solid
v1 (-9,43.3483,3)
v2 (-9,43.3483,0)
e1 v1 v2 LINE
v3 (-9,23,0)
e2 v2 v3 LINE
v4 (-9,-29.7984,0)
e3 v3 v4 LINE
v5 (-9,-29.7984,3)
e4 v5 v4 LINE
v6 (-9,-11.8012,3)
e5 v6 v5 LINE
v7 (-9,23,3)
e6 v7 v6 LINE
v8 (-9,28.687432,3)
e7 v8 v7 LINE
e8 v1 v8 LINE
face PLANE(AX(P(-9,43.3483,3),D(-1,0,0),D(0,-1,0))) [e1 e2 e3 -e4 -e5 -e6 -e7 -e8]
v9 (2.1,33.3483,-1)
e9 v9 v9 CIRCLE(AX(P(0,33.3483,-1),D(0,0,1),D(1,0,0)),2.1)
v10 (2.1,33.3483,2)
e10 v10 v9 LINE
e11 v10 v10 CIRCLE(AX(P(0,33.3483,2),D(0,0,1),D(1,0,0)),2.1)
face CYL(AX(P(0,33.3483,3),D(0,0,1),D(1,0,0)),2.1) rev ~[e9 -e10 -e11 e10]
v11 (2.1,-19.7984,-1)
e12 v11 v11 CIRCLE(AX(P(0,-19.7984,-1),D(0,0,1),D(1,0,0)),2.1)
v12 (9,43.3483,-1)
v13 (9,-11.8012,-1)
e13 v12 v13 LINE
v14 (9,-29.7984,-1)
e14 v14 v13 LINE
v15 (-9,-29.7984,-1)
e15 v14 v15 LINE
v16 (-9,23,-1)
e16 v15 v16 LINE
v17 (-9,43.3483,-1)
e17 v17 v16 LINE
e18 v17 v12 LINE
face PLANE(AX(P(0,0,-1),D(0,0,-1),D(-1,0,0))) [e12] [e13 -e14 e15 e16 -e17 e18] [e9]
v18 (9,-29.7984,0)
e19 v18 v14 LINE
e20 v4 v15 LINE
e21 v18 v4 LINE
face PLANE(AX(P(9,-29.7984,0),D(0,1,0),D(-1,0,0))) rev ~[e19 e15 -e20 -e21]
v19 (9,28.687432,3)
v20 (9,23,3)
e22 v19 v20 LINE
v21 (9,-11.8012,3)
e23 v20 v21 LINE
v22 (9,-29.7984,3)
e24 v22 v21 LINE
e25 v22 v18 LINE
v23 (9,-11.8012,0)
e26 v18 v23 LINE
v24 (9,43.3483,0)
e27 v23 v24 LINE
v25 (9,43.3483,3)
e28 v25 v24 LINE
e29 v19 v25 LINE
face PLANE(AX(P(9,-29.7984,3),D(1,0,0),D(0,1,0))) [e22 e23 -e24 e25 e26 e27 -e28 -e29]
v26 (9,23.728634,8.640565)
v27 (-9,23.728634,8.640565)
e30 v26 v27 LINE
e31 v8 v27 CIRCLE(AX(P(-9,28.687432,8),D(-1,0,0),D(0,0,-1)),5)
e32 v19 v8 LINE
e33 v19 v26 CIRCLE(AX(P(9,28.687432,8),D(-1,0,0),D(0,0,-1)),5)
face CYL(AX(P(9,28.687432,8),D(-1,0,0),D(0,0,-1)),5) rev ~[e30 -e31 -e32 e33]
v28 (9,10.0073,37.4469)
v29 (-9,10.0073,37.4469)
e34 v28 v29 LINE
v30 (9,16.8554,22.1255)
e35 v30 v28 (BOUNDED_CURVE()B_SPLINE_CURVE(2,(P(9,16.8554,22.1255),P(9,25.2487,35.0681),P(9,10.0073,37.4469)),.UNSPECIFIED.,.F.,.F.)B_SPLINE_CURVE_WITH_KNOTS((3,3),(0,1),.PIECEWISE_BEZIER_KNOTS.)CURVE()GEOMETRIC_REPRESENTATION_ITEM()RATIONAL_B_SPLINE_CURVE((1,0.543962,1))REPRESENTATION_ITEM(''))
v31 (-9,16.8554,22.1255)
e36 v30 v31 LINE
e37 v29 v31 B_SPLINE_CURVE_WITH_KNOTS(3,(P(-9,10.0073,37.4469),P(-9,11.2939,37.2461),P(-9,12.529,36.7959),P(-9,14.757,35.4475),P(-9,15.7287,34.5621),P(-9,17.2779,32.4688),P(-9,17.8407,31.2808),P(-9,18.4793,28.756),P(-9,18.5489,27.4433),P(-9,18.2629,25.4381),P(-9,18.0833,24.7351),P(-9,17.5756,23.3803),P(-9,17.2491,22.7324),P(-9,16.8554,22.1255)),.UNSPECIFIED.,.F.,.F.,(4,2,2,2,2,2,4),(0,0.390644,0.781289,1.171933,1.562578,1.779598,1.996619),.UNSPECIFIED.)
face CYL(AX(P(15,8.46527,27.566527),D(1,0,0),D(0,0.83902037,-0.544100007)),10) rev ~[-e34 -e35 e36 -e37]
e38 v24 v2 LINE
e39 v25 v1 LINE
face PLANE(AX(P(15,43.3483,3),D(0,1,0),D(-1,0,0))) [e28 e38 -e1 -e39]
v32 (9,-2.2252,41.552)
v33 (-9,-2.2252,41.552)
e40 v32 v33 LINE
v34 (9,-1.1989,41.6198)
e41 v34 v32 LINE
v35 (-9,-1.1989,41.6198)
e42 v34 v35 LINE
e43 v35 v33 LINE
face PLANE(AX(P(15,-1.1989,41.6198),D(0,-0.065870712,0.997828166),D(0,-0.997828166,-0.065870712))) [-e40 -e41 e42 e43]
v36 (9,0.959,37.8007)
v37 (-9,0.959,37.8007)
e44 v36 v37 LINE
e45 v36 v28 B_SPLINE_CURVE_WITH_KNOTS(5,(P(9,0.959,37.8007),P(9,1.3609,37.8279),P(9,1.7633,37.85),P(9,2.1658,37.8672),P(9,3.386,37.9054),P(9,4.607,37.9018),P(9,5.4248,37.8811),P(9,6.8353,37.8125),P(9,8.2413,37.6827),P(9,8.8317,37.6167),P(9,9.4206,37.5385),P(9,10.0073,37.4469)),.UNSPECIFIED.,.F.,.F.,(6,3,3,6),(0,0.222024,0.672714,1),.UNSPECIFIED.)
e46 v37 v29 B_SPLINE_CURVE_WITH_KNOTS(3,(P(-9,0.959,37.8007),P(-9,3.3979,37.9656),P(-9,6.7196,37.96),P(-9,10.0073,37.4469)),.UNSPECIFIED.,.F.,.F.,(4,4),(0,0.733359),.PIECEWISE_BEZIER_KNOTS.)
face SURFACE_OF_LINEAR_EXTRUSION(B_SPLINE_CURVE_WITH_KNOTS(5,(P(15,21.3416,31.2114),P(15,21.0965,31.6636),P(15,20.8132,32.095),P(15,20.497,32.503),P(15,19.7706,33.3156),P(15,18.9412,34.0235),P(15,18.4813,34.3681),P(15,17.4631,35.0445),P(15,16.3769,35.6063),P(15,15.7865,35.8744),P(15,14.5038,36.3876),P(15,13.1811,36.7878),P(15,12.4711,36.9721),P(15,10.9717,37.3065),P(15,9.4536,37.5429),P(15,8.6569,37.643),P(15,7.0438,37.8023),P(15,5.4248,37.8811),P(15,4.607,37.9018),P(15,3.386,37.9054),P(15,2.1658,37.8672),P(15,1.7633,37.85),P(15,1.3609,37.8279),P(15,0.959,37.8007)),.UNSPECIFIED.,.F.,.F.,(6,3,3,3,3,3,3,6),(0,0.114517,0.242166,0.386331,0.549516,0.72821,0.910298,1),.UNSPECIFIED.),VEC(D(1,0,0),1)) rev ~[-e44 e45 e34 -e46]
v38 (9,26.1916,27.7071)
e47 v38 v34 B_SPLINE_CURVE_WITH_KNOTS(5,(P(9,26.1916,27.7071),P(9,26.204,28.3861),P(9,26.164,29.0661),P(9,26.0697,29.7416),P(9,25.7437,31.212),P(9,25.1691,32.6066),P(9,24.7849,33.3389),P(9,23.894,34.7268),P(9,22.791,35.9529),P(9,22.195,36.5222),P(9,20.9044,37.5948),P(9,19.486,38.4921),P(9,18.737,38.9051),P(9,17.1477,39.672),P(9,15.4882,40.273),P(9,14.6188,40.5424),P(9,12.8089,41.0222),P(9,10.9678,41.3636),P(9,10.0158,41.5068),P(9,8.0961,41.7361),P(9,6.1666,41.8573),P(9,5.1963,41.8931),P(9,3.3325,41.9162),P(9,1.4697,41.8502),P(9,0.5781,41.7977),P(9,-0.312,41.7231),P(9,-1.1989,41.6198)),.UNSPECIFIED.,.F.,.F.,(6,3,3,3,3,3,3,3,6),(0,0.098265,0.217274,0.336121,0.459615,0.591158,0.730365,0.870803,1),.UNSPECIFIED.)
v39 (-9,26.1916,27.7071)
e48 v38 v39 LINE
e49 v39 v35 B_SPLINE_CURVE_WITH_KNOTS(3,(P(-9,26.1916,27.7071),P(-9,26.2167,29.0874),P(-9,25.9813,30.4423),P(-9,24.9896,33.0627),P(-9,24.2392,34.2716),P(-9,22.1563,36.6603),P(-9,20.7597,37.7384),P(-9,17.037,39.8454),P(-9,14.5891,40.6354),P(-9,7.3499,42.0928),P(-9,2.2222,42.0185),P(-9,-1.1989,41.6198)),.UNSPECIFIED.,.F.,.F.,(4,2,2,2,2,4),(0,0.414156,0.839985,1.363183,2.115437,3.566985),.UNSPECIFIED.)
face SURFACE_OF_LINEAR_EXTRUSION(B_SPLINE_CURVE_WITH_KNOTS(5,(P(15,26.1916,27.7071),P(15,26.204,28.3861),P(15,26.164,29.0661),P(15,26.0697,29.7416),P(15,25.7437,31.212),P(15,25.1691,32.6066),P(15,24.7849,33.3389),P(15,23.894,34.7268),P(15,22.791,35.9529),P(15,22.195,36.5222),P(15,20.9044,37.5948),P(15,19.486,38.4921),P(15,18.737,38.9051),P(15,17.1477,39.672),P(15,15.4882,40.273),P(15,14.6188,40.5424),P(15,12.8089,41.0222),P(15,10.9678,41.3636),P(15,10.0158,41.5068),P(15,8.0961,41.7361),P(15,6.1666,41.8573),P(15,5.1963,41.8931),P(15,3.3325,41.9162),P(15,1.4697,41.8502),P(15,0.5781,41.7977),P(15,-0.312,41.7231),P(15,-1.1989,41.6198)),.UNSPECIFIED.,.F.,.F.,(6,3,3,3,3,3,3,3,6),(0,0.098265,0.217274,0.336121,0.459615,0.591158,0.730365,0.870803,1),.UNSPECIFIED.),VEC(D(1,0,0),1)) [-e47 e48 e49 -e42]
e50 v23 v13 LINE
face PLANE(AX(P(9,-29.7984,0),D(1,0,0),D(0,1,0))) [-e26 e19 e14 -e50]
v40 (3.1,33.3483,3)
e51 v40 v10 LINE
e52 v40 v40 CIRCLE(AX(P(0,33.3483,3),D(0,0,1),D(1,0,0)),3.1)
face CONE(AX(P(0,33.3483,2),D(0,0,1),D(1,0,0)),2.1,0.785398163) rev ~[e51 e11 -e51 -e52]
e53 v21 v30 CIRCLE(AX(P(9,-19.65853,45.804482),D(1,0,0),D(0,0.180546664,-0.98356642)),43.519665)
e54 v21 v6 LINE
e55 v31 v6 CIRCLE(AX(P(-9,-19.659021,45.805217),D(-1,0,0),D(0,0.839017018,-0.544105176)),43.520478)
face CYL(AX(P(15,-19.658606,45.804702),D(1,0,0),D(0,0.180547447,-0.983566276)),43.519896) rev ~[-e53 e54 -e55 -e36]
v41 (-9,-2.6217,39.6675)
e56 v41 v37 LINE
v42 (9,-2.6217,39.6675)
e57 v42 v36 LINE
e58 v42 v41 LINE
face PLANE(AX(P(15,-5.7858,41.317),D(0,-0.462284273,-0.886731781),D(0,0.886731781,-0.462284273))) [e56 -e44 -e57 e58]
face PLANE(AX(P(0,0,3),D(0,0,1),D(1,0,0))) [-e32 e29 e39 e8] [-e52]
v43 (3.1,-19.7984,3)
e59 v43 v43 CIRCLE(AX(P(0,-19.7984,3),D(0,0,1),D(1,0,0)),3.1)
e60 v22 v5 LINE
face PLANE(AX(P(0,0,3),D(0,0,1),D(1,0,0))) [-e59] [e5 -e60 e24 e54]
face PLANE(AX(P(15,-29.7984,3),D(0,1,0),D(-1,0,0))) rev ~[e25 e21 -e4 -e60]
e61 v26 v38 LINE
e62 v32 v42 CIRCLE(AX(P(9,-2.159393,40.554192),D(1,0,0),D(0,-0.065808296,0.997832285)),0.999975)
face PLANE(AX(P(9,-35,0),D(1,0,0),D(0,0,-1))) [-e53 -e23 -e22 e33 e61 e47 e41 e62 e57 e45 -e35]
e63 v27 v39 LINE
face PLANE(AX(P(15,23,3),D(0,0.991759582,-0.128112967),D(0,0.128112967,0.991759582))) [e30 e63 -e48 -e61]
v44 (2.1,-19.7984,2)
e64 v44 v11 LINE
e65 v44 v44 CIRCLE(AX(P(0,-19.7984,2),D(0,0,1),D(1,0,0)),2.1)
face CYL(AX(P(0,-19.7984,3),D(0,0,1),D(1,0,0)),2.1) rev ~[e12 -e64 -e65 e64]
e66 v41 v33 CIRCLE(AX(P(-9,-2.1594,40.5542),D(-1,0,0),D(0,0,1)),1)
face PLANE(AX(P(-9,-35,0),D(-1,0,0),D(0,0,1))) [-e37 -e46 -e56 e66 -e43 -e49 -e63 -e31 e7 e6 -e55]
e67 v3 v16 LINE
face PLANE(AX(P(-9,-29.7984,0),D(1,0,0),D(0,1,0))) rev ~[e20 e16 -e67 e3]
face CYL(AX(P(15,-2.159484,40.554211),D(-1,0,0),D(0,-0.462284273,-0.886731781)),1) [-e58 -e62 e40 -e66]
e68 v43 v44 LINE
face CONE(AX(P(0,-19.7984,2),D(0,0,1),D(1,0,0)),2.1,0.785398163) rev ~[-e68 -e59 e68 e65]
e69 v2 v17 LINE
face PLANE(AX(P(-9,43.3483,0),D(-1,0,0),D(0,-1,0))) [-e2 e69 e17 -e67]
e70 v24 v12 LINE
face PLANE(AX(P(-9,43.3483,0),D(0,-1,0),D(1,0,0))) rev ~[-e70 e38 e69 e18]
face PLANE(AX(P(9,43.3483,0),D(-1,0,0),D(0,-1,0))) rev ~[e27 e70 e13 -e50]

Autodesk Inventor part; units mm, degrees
ref_plane "YZ Plane" through (0, 0, 0) normal (1, 0, 0) x (0, 1, 0)
ref_plane "XZ Plane" through (0, 0, 0) normal (0, 1, 0) x (-1, 0, 0)
ref_plane "XY Plane" through (0, 0, 0) normal (0, 0, 1) x (1, 0, 0)
sketch "Boceto1" plane through (0, 0, 0) normal (0, 0, 1) x (1, 0, 0)
  line L0 (15, -35) -> (-15, -35)
  line L1 (-15, -35) -> (-15, 35)
  line L2 (-15, 35) -> (15, 35)
  line L3 (15, 35) -> (15, -35)
  line L4 (15, -35) -> (-15, 35) construction
  line L5 (-15, -35) -> (15, 35) construction
  line L6 (0, 35) -> (0, -35) construction
  circle A0 centre (0, 28.5) radius 2
  line L7 (-19.7941, 0) -> (22.4931, 0) construction
  circle A1 centre (0, -28.5) radius 2
  point P0 (0, 0)
  dimension "d0" = 70
  dimension "d1" = 30
  dimension "d2" = 4
  dimension "d3" = 6.5
  dimension "d4" = 6.5
extrude "Extrusión1" add sketch "Boceto1" along normal blind 3
sketch "Boceto2" plane through (15, -35, 0) normal (1, 0, 0) x (0, 0, -1)
  line L0 (-1.8712, 18.1097) -> (-14.4034, 50.7658) construction
  line L1 (-14.4034, 50.7658) -> (-23.5228, 61.8317) construction
  line L2 (-23.5228, 61.8317) -> (-35.5227, 59.996) construction
  line L3 (-35.5227, 59.996) -> (-40.0788, 48.4605) construction
  line L4 (-40.0788, 48.4605) -> (-40.0788, 37.855) construction
  line L5 (-40.0788, 37.855) -> (-39.6332, 34.0327) construction
  spline S0 degree 4 poles (-1.8712, 18.1097) (-14.4034, 50.7658) (-23.5228, 61.8317) (-35.5227, 59.996) (-40.0788, 48.4605) (-40.0788, 37.855) (-39.6332, 34.0327) knots 1 1 1 1 1 2 3 4 4 4 4 4 construction
  line L6 (-3, 61.5) -> (-3, 65.5) projected
  line L7 (-3, 0) -> (-3, 70) projected
  line L8 (-3, 70) -> (-3, 58)
  line L9 (-3, 58) -> (-27.7071, 61.1916)
  line L10 (-3, 58) -> (-3, 23.1988)
  line L11 (-41.6198, 33.8011) -> (-41.317, 29.2142)
  line L12 (-41.317, 29.2142) -> (-37.8007, 35.959)
  arc A0 (-3, 23.1988) -> (-31.2114, 56.3416) centre (-45.8049, 15.3413) ccw
  spline S1 degree 5 poles (-27.7071, 61.1916) (-28.3861, 61.204) (-29.0661, 61.164) (-29.7416, 61.0697) (-31.212, 60.7437) (-32.6066, 60.1691) (-33.3389, 59.7849) (-34.7268, 58.894) (-35.9529, 57.791) (-36.5222, 57.195) (-37.5948, 55.9044) (-38.4921, 54.486) (-38.9051, 53.737) (-39.672, 52.1477) (-40.273, 50.4882) (-40.5424, 49.6188) (-41.0222, 47.8089) (-41.3636, 45.9678) (-41.5068, 45.0158) (-41.7361, 43.0961) (-41.8573, 41.1666) (-41.8931, 40.1963) (-41.9162, 38.3325) (-41.8502, 36.4697) (-41.7977, 35.5781) (-41.7231, 34.688) (-41.6198, 33.8011) knots 0 0 0 0 0 0 0.098265 0.098265 0.098265 0.217274 0.217274 0.217274 0.336121 0.336121 0.336121 0.459615 0.459615 0.459615 0.591158 0.591158 0.591158 0.730365 0.730365 0.730365 0.870803 0.870803 0.870803 1 1 1 1 1 1
  spline S2 degree 5 poles (-31.2114, 56.3416) (-31.6636, 56.0965) (-32.095, 55.8132) (-32.503, 55.497) (-33.3156, 54.7706) (-34.0235, 53.9412) (-34.3681, 53.4813) (-35.0445, 52.4631) (-35.6063, 51.3769) (-35.8744, 50.7865) (-36.3876, 49.5038) (-36.7878, 48.1811) (-36.9721, 47.4711) (-37.3065, 45.9717) (-37.5429, 44.4536) (-37.643, 43.6569) (-37.8023, 42.0438) (-37.8811, 40.4248) (-37.9018, 39.607) (-37.9054, 38.386) (-37.8672, 37.1658) (-37.85, 36.7633) (-37.8279, 36.3609) (-37.8007, 35.959) knots 0 0 0 0 0 0 0.114517 0.114517 0.114517 0.242166 0.242166 0.242166 0.386331 0.386331 0.386331 0.549516 0.549516 0.549516 0.72821 0.72821 0.72821 0.910298 0.910298 0.910298 1 1 1 1 1 1
  point P0 (0, 35)
  point P1 (-17.4487, 48.3553)
  point P2 (-3, 11.1175)
  point P3 (-18.9631, 49.5979)
  dimension "d7" = 2
  dimension "d9" = 12
  dimension "d10" = 24.7071
  dimension "d32" = 34.8012
  dimension "d33" = 12.0812
  dimension "d34" = 9.1194
  dimension "d35" = 11.0659
  dimension "d36" = 32.6561
  dimension "d37" = 12.5322
  dimension "d38" = 43.5201
  dimension "d39" = 10.6055
  dimension "d40" = 3.5163
  dimension "d41" = 6.7448
  dimension "d42" = 34.8008
  dimension "d43" = 20.3826
  dimension "d44" = 1.6584
  dimension "d45" = 16.556
  dimension "d46" = 13.3712
extrude "Extrusión2" add sketch "Boceto2" against normal up to surface (30 mm away)
fillet "Empalme5" radius 10 1 edges at (0, 21.3416, 31.2114)
fillet "Empalme6" radius 1 1 edges at (0, -5.7858, 41.317)
sketch "Boceto3" plane through (15, -35, 0) normal (1, 0, 0) x (0, 0, -1)
  arc A0 (-41.552, 32.7748) -> (-39.6675, 32.3783) centre (-40.5542, 32.8406) ccw projected
  line L0 (-39.6675, 32.3783) -> (-37.8007, 35.959) projected
  spline S0 degree 5 poles (-37.8007, 35.959) (-37.8279, 36.3609) (-37.85, 36.7633) (-37.8672, 37.1658) (-37.9054, 38.386) (-37.9018, 39.607) (-37.8811, 40.4248) (-37.8125, 41.8353) (-37.6827, 43.2413) (-37.6167, 43.8317) (-37.5385, 44.4206) (-37.4469, 45.0073) knots 0 0 0 0 0 0 0.222024 0.222024 0.222024 0.672714 0.672714 0.672714 1 1 1 1 1 1 projected
  spline S1 degree 2 poles (-22.1255, 51.8554) (-35.0681, 60.2487) (-37.4469, 45.0073) knots 0 0 0 1 1 1 weights 1 0.543962 1 projected
  arc A1 (-3, 23.1988) -> (-22.1255, 51.8554) centre (-45.8049, 15.3413) ccw projected
  line L1 (-3, 0) -> (-3, 23.1988) projected
  line L2 (0, 0) -> (-3, 0) projected
  line L3 (0, 70) -> (0, 0) projected
  line L4 (0, 70) -> (-3, 70) projected
  line L5 (-3, 58) -> (-3, 70) projected
  line L6 (-3, 58) -> (-27.7071, 61.1916) projected
  spline S2 degree 5 poles (-27.7071, 61.1916) (-28.3861, 61.204) (-29.0661, 61.164) (-29.7416, 61.0697) (-31.212, 60.7437) (-32.6066, 60.1691) (-33.3389, 59.7849) (-34.7268, 58.894) (-35.9529, 57.791) (-36.5222, 57.195) (-37.5948, 55.9044) (-38.4921, 54.486) (-38.9051, 53.737) (-39.672, 52.1477) (-40.273, 50.4882) (-40.5424, 49.6188) (-41.0222, 47.8089) (-41.3636, 45.9678) (-41.5068, 45.0158) (-41.7361, 43.0961) (-41.8573, 41.1666) (-41.8931, 40.1963) (-41.9162, 38.3325) (-41.8502, 36.4697) (-41.7977, 35.5781) (-41.7231, 34.688) (-41.6198, 33.8011) knots 0 0 0 0 0 0 0.098265 0.098265 0.098265 0.217274 0.217274 0.217274 0.336121 0.336121 0.336121 0.459615 0.459615 0.459615 0.591158 0.591158 0.591158 0.730365 0.730365 0.730365 0.870803 0.870803 0.870803 1 1 1 1 1 1 projected
  line L7 (-41.6198, 33.8011) -> (-41.552, 32.7748) projected
  line L8 (-3, 58) -> (-3, 23.1988)
  point P0 (0, 35)
extrude "Extrusión3" cut sketch "Boceto3" against normal blind 6 contours L7 S2 L6 L8 A1 S1 S0 L0 A0
sketch "Boceto4" plane through (-15, -35, 0) normal (-1, 0, 0) x (0, 0, 1)
  arc A0 (41.552, 32.7748) -> (39.6675, 32.3783) centre (40.5542, 32.8406) ccw projected
  line L0 (41.6198, 33.8011) -> (41.552, 32.7748) projected
  spline S0 degree 3 poles (27.7071, 61.1916) (29.0874, 61.2167) (30.4423, 60.9813) (33.0627, 59.9896) (34.2716, 59.2392) (36.6603, 57.1563) (37.7384, 55.7597) (39.8454, 52.037) (40.6354, 49.5891) (42.0928, 42.3499) (42.0185, 37.2222) (41.6198, 33.8011) knots 0 0 0 0 0.414156 0.414156 0.839985 0.839985 1.363183 1.363183 2.115437 2.115437 3.566985 3.566985 3.566985 3.566985 projected
  line L1 (3, 58) -> (27.7071, 61.1916) projected
  arc A1 (22.1255, 51.8554) -> (3, 23.1988) centre (45.8049, 15.3413) ccw projected
  spline S1 degree 3 poles (37.4469, 45.0073) (37.2461, 46.2939) (36.7959, 47.529) (35.4475, 49.757) (34.5621, 50.7287) (32.4688, 52.2779) (31.2808, 52.8407) (28.756, 53.4793) (27.4433, 53.5489) (25.4381, 53.2629) (24.7351, 53.0833) (23.3803, 52.5756) (22.7324, 52.2491) (22.1255, 51.8554) knots 0 0 0 0 0.390644 0.390644 0.781289 0.781289 1.171933 1.171933 1.562578 1.562578 1.779598 1.779598 1.996619 1.996619 1.996619 1.996619 projected
  spline S2 degree 3 poles (37.8007, 35.959) (37.9656, 38.3979) (37.96, 41.7196) (37.4469, 45.0073) knots 0 0 0 0 0.733359 0.733359 0.733359 0.733359 projected
  line L2 (39.6675, 32.3783) -> (37.8007, 35.959) projected
  line L3 (3, 58) -> (3, 23.1988) projected
  line L4 (3, 58) -> (3, 23.1988)
  arc A2 (41.552, 32.7748) -> (39.6675, 32.3783) centre (40.5542, 32.8406) ccw projected
  line L5 (41.6198, 33.8011) -> (41.552, 32.7748) projected
  spline S3 degree 3 poles (27.7071, 61.1916) (29.0874, 61.2167) (30.4423, 60.9813) (33.0627, 59.9896) (34.2716, 59.2392) (36.6603, 57.1563) (37.7384, 55.7597) (39.8454, 52.037) (40.6354, 49.5891) (42.0928, 42.3499) (42.0185, 37.2222) (41.6198, 33.8011) knots 0 0 0 0 0.414156 0.414156 0.839985 0.839985 1.363183 1.363183 2.115437 2.115437 3.566985 3.566985 3.566985 3.566985 projected
  line L6 (3, 58) -> (27.7071, 61.1916) projected
  arc A3 (22.1255, 51.8554) -> (3, 23.1988) centre (45.8049, 15.3413) ccw projected
  spline S4 degree 3 poles (37.4469, 45.0073) (37.2461, 46.2939) (36.7959, 47.529) (35.4475, 49.757) (34.5621, 50.7287) (32.4688, 52.2779) (31.2808, 52.8407) (28.756, 53.4793) (27.4433, 53.5489) (25.4381, 53.2629) (24.7351, 53.0833) (23.3803, 52.5756) (22.7324, 52.2491) (22.1255, 51.8554) knots 0 0 0 0 0.390644 0.390644 0.781289 0.781289 1.171933 1.171933 1.562578 1.562578 1.779598 1.779598 1.996619 1.996619 1.996619 1.996619 projected
  spline S5 degree 3 poles (37.8007, 35.959) (37.9656, 38.3979) (37.96, 41.7196) (37.4469, 45.0073) knots 0 0 0 0 0.733359 0.733359 0.733359 0.733359 projected
  line L7 (39.6675, 32.3783) -> (37.8007, 35.959) projected
  circle A4 centre (40.5542, 32.8406) radius 1
  point P0 (0, 35)
extrude "Extrusión4" cut sketch "Boceto4" against normal blind 6
sketch "Boceto5" plane through (0, 0, 3) normal (0, 0, 1) x (1, 0, 0)
  circle A0 centre (0, -28.5) radius 2 projected
  circle A1 centre (0, -28.5) radius 4.6184
  circle A2 centre (0, 28.5) radius 2 projected
  circle A3 centre (0, 28.5) radius 3.6227
  point P0 (0, 0)
extrude "Extrusión5" add sketch "Boceto5" against normal up to surface (3 mm away) contours A0 | A2
sketch "Boceto6" plane through (0, 0, 3) normal (0, 0, 1) x (1, 0, 0)
  circle A0 centre (0, -19.7984) radius 2.1
  line L0 (-14.9492, 6.775) -> (15, 6.775) construction
  line L1 (15, -35) -> (15, 35) projected
  line L2 (11, 25.275) -> (-11, 25.275) projected
  line L3 (9, -11.8012) -> (-9, -11.8012) projected
  circle A1 centre (0, 33.3483) radius 2.1
  line L4 (-15, -35) -> (15, -35) projected
  line L5 (-15, 35) -> (-15, -35) projected
  point P0 (0, 0)
  point P1 (11, -11.8012)
  point P2 (-11, -11.8012)
  dimension "d66" = 4.2
  dimension "d67" = 15.2016
  dimension "d68" = 15
sketch "Boceto7" plane through (0, 0, 3) normal (0, 0, 1) x (1, 0, 0)
  line L0 (-15, -35) -> (15, -35) projected
  line L1 (15, -35) -> (15, 35) projected
  line L2 (-15, -35) -> (15, -35)
  line L3 (15, -35) -> (15, -29.7984)
  line L4 (15, -29.7984) -> (-15, -29.7984)
  line L5 (-15, -29.7984) -> (-15, -35)
  circle A0 centre (0, -19.7984) radius 2.1 projected
  point P0 (0, 0)
  dimension "d51" = 10
extrude "Extrusión6" cut sketch "Boceto7" against normal blind 7 contours L5 L4 L1 L0
sketch "Boceto8" plane through (0, 0, 3) normal (0, 0, 1) x (1, 0, 0)
  line L0 (-15, 35) -> (15, 35)
  line L1 (15, 35) -> (15, 43.3483)
  line L2 (15, 43.3483) -> (-15, 43.3483)
  line L3 (-15, 43.3483) -> (-15, 35)
  circle A0 centre (0, 33.3483) radius 2.1 projected
  point P0 (0, 0)
  dimension "d54" = 10
extrude "Extrusión7" add sketch "Boceto8" against normal up to surface (3 mm away) contours L3 L2 L1 L0 A0 | A0 L0 picked at (-0.3005, 35.0816)
sketch "Boceto9" plane through (0, 0, 3) normal (0, 0, 1) x (1, 0, 0)
  line L0 (15, 43.3483) -> (-15, 43.3483) projected
  line L1 (9, -29.7984) -> (9, 43.3483)
  line L2 (-9, 43.3483) -> (-9, -29.7984)
  line L3 (-15, -29.7984) -> (15, -29.7984) projected
  line L4 (-9, -11.8012) -> (-9, 23) projected
  line L5 (9, 23) -> (9, -11.8012) projected
  line L6 (-15, 43.3483) -> (-15, -29.7984) projected
  line L7 (-9, -29.7984) -> (-15, -29.7984)
  line L8 (-15, -29.7984) -> (-15, 43.3483)
  line L9 (-15, 43.3483) -> (-9, 43.3483)
  line L10 (-9, 43.3483) -> (-9, -29.7984)
  line L11 (15, -29.7984) -> (15, 43.3483) projected
  line L12 (9, 43.3483) -> (15, 43.3483)
  line L13 (15, 43.3483) -> (15, -29.7984)
  line L14 (15, -29.7984) -> (9, -29.7984)
  line L15 (9, -29.7984) -> (9, 43.3483)
  point P0 (0, 0)
extrude "Extrusión8" cut sketch "Boceto9" against normal blind 7 contours L11 L3 L1 L0 | L2 L3 L6 L0
sketch "Boceto10" plane through (0, 0, 0) normal (0, 0, -1) x (-1, 0, 0)
  line L0 (9, 43.3483) -> (9, 23) projected
  line L1 (-9, -29.7984) -> (-9, -11.8012) projected
  line L2 (9, 43.3483) -> (-9, 43.3483)
  line L3 (-9, 43.3483) -> (-9, -29.7984)
  line L4 (-9, -29.7984) -> (9, -29.7984)
  line L5 (9, -29.7984) -> (9, 43.3483)
  point P0 (0, 0)
extrude "Extrusión9" add sketch "Boceto10" along normal blind 1
extrude "Extrusión10" cut sketch "Boceto6" against normal up to surface (4 mm away)
chamfer "Chaflán1" distance 1 angle 45 2 edges at (-2.1, -19.7984, 3) (-2.1, 33.3483, 3)
fillet "Empalme8" radius 5 1 edges at (0, 23, 3)
equation "\"d4\" = d3"
properties part number "CoronaVirus"
